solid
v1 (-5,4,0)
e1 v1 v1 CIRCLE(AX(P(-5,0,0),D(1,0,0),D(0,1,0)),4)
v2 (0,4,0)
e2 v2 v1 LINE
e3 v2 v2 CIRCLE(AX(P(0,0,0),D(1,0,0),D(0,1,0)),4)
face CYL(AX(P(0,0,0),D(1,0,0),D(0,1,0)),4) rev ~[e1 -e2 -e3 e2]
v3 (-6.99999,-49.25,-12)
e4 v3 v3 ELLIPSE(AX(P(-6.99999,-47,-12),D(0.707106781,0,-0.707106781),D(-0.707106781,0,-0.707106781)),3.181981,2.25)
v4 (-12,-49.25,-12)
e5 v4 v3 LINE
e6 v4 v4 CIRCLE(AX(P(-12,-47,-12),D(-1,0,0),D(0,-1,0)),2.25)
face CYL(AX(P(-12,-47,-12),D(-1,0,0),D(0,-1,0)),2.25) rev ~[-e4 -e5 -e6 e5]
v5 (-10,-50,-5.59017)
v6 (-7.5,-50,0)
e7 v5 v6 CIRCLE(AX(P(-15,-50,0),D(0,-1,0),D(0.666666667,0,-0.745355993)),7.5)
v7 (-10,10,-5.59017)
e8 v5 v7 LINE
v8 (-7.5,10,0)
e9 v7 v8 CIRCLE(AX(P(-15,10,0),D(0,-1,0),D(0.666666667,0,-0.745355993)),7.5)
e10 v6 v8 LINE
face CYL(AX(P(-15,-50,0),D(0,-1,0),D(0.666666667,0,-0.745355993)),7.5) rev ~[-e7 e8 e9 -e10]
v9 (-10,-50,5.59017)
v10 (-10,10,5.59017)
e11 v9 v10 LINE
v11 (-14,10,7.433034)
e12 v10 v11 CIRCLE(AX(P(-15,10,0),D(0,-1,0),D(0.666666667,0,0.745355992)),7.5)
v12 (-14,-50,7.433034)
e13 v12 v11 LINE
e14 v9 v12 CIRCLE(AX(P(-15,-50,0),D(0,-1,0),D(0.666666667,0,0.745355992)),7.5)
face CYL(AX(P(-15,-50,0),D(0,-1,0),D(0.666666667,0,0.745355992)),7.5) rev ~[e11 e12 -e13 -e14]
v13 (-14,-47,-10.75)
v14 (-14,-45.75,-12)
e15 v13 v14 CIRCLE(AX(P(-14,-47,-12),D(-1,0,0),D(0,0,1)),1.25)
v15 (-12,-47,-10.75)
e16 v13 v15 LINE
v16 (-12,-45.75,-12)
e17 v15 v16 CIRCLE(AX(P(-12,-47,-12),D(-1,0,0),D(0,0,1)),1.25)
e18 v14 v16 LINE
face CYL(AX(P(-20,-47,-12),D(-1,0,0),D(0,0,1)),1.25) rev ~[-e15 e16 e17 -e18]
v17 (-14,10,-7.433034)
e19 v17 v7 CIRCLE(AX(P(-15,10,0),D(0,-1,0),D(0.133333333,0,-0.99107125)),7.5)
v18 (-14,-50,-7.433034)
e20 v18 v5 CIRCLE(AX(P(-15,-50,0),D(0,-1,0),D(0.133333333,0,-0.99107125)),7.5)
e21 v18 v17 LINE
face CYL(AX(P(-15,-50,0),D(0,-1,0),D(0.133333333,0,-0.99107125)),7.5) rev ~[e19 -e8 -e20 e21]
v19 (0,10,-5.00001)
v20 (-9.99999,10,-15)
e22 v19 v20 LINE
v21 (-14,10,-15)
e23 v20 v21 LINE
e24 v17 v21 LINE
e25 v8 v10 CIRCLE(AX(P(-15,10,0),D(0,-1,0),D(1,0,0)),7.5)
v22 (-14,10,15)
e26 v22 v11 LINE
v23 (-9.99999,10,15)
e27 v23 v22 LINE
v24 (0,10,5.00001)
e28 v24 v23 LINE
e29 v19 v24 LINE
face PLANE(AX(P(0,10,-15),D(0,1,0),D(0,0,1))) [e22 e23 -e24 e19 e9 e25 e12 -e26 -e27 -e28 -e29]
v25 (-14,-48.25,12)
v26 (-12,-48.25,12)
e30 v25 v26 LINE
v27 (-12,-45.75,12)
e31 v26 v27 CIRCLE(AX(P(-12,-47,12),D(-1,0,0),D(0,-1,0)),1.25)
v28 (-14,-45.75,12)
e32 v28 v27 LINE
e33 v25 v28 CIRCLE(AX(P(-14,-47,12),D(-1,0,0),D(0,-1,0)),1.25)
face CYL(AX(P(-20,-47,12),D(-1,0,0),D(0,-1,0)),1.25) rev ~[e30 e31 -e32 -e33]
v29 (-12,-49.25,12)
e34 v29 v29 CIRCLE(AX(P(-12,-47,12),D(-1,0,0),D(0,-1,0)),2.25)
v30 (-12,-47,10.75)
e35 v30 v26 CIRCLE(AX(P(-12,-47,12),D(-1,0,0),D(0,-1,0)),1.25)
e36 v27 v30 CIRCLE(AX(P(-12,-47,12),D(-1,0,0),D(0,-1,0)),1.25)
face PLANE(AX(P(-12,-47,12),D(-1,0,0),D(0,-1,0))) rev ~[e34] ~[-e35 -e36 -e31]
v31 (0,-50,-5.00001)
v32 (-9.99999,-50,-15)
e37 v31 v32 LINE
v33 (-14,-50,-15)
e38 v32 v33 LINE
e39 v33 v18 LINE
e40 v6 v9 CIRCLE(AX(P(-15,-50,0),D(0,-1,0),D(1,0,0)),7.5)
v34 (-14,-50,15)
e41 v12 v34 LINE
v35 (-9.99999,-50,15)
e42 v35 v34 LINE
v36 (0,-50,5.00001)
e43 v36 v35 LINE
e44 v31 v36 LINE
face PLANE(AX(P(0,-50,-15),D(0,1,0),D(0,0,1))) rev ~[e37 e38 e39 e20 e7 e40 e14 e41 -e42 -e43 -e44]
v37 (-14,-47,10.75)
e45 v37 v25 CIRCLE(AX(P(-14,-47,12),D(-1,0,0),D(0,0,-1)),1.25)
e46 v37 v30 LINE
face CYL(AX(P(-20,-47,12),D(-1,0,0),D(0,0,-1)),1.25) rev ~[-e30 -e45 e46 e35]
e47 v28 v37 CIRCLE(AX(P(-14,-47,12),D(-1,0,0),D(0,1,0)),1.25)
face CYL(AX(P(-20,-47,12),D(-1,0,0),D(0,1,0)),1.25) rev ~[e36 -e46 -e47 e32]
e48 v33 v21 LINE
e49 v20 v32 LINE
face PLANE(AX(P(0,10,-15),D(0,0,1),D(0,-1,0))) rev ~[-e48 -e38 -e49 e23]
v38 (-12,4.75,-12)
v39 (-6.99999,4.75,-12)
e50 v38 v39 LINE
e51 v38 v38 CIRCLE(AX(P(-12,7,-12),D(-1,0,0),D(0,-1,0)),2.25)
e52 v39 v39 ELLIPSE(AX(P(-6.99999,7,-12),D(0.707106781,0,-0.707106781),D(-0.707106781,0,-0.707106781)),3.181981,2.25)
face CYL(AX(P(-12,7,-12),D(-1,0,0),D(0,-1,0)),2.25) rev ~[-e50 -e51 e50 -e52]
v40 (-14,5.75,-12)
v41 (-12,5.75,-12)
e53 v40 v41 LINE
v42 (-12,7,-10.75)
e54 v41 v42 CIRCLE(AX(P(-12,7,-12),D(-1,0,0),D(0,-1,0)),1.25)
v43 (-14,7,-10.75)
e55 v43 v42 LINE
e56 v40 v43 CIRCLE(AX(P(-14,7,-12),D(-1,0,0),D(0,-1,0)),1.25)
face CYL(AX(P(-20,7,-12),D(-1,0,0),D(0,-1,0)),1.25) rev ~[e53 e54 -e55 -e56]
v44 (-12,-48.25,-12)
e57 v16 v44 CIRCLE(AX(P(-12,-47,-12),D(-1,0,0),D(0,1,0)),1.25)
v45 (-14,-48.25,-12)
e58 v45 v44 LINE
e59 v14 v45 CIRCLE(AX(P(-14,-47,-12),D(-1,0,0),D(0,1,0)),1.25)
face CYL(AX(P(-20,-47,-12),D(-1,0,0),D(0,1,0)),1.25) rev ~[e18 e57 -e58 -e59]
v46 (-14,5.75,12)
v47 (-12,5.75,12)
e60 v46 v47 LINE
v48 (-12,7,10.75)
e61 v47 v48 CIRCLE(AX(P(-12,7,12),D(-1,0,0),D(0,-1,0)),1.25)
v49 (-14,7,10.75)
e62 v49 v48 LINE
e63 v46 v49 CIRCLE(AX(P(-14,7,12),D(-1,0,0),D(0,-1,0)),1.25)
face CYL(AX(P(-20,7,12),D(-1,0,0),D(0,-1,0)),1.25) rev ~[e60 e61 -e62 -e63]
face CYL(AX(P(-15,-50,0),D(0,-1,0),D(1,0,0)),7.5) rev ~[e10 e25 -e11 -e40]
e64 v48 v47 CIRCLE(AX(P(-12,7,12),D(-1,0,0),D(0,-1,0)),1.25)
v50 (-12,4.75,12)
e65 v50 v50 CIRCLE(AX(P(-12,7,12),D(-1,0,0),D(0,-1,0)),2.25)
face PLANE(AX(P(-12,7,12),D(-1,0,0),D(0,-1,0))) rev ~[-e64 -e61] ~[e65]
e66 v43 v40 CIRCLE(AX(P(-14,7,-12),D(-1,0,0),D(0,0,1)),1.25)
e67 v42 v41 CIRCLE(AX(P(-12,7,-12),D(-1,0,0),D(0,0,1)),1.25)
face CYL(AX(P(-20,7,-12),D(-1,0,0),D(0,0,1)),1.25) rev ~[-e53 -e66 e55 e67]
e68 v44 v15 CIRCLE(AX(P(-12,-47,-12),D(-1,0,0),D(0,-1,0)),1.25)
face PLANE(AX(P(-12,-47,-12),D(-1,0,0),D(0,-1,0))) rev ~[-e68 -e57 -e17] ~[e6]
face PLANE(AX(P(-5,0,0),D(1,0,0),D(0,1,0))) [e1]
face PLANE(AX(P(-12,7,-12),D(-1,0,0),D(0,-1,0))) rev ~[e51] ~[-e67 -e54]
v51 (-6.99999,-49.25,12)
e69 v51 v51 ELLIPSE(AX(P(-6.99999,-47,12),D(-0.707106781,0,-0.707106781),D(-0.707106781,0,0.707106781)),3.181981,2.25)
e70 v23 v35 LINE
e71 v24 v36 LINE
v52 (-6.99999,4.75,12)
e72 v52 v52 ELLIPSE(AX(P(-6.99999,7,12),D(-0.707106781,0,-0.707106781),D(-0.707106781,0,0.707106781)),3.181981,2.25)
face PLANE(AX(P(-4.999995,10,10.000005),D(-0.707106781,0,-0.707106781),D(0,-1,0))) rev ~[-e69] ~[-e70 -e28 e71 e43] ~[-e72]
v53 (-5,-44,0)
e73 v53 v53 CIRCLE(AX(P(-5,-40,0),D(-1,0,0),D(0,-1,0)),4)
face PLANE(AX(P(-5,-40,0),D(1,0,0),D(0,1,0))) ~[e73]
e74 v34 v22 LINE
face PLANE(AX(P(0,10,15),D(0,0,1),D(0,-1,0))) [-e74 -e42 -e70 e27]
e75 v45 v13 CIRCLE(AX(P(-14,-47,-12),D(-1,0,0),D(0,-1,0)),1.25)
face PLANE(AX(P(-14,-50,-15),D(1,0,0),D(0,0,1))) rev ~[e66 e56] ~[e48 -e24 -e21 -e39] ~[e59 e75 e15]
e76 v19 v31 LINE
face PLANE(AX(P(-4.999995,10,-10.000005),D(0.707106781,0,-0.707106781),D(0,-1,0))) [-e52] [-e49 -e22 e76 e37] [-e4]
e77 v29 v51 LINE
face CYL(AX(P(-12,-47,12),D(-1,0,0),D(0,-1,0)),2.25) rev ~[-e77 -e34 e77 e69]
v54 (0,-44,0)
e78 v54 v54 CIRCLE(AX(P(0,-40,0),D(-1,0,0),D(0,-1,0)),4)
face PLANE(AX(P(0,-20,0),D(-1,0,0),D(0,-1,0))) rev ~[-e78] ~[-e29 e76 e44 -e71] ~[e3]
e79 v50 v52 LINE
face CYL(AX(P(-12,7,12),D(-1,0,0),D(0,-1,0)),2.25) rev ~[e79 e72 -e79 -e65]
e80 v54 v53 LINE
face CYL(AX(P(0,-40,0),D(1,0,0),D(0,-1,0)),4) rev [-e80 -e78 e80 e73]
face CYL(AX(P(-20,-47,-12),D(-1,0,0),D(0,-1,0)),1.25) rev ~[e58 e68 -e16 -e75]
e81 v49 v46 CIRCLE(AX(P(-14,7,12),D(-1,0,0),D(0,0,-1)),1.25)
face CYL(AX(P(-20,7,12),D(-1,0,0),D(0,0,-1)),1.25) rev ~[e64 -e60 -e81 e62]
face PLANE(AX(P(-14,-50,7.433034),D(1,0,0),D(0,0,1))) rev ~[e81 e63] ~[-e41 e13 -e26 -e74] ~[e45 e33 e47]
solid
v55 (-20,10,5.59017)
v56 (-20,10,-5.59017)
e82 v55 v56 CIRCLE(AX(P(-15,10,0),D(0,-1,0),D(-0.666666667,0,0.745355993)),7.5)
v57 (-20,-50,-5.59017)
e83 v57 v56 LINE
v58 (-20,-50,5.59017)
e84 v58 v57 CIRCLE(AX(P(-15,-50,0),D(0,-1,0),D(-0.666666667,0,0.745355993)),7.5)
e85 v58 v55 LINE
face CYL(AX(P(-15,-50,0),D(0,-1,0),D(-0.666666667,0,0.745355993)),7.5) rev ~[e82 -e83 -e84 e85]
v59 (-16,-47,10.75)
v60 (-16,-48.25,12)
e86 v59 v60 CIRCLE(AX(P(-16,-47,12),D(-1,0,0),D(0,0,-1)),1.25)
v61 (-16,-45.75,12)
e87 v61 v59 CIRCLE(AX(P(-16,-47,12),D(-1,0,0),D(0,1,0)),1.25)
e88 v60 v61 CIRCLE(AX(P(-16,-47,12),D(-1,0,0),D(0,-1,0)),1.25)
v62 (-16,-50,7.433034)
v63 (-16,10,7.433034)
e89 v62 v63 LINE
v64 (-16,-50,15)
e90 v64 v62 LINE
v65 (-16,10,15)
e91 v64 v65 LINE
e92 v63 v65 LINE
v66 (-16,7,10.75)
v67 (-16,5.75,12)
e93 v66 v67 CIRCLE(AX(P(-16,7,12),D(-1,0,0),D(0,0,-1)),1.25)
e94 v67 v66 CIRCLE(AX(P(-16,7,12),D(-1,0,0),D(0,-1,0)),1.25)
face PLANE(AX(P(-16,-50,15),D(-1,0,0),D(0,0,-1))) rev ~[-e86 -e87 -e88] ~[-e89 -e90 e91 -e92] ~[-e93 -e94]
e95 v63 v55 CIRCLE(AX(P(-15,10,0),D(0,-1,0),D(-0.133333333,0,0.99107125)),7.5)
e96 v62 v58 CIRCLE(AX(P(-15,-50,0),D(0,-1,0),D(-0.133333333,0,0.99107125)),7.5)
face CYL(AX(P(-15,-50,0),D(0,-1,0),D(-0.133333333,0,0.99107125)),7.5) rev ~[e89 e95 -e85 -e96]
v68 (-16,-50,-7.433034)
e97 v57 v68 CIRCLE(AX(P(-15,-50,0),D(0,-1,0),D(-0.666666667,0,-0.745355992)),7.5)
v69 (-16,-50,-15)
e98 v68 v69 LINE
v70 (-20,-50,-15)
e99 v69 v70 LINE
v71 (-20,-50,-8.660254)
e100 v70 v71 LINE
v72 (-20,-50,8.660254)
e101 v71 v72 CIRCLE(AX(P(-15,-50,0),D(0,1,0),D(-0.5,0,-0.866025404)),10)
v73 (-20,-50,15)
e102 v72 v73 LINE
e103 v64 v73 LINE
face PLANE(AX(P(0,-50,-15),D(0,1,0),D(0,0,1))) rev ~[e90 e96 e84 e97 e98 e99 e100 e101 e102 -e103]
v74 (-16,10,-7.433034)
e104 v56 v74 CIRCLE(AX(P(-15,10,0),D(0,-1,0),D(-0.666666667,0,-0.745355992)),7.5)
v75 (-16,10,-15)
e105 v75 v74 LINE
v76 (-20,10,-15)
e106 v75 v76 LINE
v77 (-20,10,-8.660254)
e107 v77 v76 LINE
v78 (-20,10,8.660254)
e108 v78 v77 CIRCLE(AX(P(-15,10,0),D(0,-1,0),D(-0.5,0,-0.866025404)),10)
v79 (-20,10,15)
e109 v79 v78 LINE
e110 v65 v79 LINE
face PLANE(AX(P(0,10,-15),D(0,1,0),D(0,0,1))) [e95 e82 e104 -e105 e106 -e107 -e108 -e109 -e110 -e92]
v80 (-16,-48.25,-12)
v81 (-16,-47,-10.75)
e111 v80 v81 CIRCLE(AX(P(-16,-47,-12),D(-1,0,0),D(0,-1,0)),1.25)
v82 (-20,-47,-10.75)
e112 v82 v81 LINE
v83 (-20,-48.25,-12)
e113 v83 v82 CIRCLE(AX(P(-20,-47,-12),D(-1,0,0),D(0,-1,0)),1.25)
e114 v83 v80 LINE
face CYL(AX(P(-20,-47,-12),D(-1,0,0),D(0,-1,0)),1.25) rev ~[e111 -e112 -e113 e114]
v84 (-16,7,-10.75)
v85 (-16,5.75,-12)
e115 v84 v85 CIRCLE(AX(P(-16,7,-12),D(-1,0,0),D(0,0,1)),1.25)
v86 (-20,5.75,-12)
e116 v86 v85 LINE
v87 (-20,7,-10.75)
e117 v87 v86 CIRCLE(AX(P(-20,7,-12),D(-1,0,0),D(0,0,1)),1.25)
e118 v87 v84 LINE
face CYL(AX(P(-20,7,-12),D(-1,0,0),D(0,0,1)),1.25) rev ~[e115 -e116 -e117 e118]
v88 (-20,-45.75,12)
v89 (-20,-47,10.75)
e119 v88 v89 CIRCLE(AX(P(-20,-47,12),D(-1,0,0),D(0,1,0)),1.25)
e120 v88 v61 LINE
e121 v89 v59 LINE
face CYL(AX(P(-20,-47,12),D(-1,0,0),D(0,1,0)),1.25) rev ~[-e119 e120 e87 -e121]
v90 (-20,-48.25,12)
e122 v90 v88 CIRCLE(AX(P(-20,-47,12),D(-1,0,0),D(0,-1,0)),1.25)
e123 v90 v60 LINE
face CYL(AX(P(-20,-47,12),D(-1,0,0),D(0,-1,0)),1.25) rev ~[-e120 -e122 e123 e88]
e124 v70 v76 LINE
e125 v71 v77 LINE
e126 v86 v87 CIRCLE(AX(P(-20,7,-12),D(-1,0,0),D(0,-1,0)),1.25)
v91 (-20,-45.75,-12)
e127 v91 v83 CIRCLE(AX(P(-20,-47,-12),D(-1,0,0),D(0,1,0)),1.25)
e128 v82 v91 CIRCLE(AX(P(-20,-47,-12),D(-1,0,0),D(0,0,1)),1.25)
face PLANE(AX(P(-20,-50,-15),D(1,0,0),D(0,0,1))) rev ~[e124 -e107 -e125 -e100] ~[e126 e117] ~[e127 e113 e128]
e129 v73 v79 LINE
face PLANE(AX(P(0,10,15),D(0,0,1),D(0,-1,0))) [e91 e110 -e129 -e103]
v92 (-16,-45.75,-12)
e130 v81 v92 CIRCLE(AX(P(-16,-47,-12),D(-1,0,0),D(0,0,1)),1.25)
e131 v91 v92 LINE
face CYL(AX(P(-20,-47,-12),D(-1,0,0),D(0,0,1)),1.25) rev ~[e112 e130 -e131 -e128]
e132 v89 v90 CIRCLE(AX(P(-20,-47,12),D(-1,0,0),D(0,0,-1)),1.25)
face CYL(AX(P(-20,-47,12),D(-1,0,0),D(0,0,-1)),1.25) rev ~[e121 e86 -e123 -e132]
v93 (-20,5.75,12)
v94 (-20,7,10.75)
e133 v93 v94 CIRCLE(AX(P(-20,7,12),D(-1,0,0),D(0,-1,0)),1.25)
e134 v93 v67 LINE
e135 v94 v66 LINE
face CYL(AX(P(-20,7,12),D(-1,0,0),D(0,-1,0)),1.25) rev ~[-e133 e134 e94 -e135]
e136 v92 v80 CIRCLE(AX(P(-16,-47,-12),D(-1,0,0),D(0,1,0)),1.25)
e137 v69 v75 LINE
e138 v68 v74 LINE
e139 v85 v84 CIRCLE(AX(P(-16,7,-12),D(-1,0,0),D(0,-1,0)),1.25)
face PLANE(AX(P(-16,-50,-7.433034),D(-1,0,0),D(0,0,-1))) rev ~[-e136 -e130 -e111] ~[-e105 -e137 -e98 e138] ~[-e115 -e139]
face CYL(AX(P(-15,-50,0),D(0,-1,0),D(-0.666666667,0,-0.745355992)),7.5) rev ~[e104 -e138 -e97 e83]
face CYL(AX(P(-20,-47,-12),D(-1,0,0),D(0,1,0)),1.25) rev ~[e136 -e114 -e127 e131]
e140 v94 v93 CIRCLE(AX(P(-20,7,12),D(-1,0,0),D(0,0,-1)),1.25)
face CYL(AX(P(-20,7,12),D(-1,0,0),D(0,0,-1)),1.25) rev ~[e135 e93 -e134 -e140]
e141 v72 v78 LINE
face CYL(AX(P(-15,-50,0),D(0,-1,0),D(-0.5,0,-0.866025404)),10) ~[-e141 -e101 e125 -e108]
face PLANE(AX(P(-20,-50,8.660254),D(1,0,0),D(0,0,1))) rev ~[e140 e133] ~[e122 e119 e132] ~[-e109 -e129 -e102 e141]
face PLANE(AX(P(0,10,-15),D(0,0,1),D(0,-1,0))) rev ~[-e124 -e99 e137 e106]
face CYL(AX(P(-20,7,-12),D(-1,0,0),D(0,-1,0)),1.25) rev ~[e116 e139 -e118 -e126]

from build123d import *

# Parameters (mm, degrees)
F0_R        = 4
F1_DEPTH    = 200
F3_R        = 4
F4_DEPTH    = 5
F3_R_2      = 5
F4_FACE_R   = 5
F4_FACE_R_2 = 4
F1_FACE_R   = 4
F2_FACE_R   = 4
F3_W        = 60.0000001103
F3_H        = 30
F5_DEPTH    = 30
F7_DEPTH    = 60.0010001103
F8_DEPTH    = 60.0010001103
F9_SIZE     = 9.99999
F11_DEPTH   = 25
F13_START   = -2
F12_R       = 2.25
F12_R_2     = 1.25
F13_DEPTH   = 23
F14_DEPTH   = 200
F15_DEPTH   = 5


# Not quite as in the source:
# - a fillet or chamfer is up to 0.001 mm smaller than in the source, because OpenCascade refuses the exact size
# - a pattern or mirror of a feature is missing from the dataset's text; its kind, count and spacing are read off the source's solid
# - a feature names something its author has since deleted; it is built from what else it names


with BuildPart() as f1:
    # F0 (on Right) → F1 (new body)
    with BuildSketch(Plane.YZ):
        Circle(F0_R)
    extrude(amount=F1_DEPTH)


with BuildPart() as f2_1:
    # F2: copy of F1
    add(f1.part.moved(Location((0, -40, 0))))


with BuildPart() as f4:
    # F3 (on face) → F4 (new body)
    with BuildSketch(Plane(origin=(0, 0, 0), x_dir=(0, -1, 0), z_dir=(-1, 0, 0))):
        with Locations((40, 0)):
            Circle(F3_R)
    extrude(amount=-F4_DEPTH)


with BuildPart() as f4b:
    # F3 (on face) → F4, piece 2 (new body)
    with BuildSketch(Plane(origin=(0, 0, 0), x_dir=(0, -1, 0), z_dir=(-1, 0, 0))):
        Circle(F3_R_2)
        Circle(F3_R, mode=Mode.SUBTRACT)
    extrude(amount=-F4_DEPTH)


with BuildPart() as f1_1:
    add(f1.part)

    add(f2_1.part)  # F5 merges F2_1

    add(f4.part)  # F5 merges F4

    add(f4b.part)  # F5 merges F4b
    # F4_face (on face) + F1_face (on face) + F2_face (on face) + F3 (on face) → F5 (join)
    with BuildSketch(Plane(origin=(0, 0, 0), x_dir=(0, -1, 0), z_dir=(-1, 0, 0))):
        Circle(F4_FACE_R)
        Circle(F4_FACE_R_2, mode=Mode.SUBTRACT)
        with Locations((40, 0)):
            Circle(F4_FACE_R_2)
    with BuildSketch(Plane(origin=(0, 0, 0), x_dir=(0, 1, 0), z_dir=(-1, 0, 0))):
        Circle(F1_FACE_R)
    with BuildSketch(Plane(origin=(0, -40, 0), x_dir=(0, -1, 0), z_dir=(-1, 0, 0))):
        Circle(F2_FACE_R)
    with BuildSketch(Plane(origin=(0, 0, 0), x_dir=(0, -1, 0), z_dir=(-1, 0, 0))):
        with Locations((19.9999999448, 0)):
            Rectangle(F3_W, F3_H)
        Circle(F3_R_2, mode=Mode.SUBTRACT)
        with Locations((40, 0)):
            Circle(F3_R_2, mode=Mode.SUBTRACT)
        with Locations((40, 0)):
            Circle(F3_R_2)
        with Locations((40, 0)):
            Circle(F3_R, mode=Mode.SUBTRACT)
    extrude(amount=F5_DEPTH)

    # F6 (on face) → F7 (cut, through all)
    with BuildSketch(Plane.XZ.offset(50)):
        with BuildLine():
            Line((-10, -5.5901699437), (-10, 5.5901699437))
            ThreePointArc((-10, 5.5901699437), (-11.8616824051, 6.8118252087), (-14, 7.4330343737))
            Line((-14, 7.4330343737), (-14, -7.4330343737))
            ThreePointArc((-14, -7.4330343737), (-11.8616824051, -6.8118252087), (-10, -5.5901699437))
        make_face()
        with BuildLine():
            Line((-14, -7.4330343737), (-14, 7.4330343737))
            ThreePointArc((-14, 7.4330343737), (-15, 7.5), (-16, 7.4330343737))
            Line((-16, 7.4330343737), (-16, -7.4330343737))
            ThreePointArc((-16, -7.4330343737), (-15, -7.5), (-14, -7.4330343737))
        make_face()
        with BuildLine():
            Line((-16, -7.4330343737), (-16, 7.4330343737))
            ThreePointArc((-16, 7.4330343737), (-18.1383175949, 6.8118252087), (-20, 5.5901699437))
            Line((-20, 5.5901699437), (-20, -5.5901699437))
            ThreePointArc((-20, -5.5901699437), (-18.1383175949, -6.8118252087), (-16, -7.4330343737))
        make_face()
        with BuildLine():
            ThreePointArc((-10, -5.5901699437), (-8.1534680312, -3.0618621785), (-7.5, 0))
            ThreePointArc((-7.5, 0), (-8.1534680312, 3.0618621785), (-10, 5.5901699437))
            Line((-10, 5.5901699437), (-10, -5.5901699437))
        make_face()
        with BuildLine():
            Line((-20, -5.5901699437), (-20, 5.5901699437))
            ThreePointArc((-20, 5.5901699437), (-22.5, 0), (-20, -5.5901699437))
        make_face()
        with BuildLine():
            ThreePointArc((-16, 9.9498743711), (-15, 10), (-14, 9.9498743711))
            Line((-14, 9.9498743711), (-14, 15))
            Line((-14, 15), (-16, 15))
            Line((-16, 15), (-16, 9.9498743711))
        make_face()
        with BuildLine():
            ThreePointArc((-16, 7.4330343737), (-15, 7.5), (-14, 7.4330343737))
            Line((-14, 7.4330343737), (-14, 9.9498743711))
            ThreePointArc((-14, 9.9498743711), (-15, 10), (-16, 9.9498743711))
            Line((-16, 9.9498743711), (-16, 7.4330343737))
        make_face()
        with BuildLine():
            Line((-14, -9.9498743711), (-14, -7.4330343737))
            ThreePointArc((-14, -7.4330343737), (-15, -7.5), (-16, -7.4330343737))
            Line((-16, -7.4330343737), (-16, -9.9498743711))
            ThreePointArc((-16, -9.9498743711), (-15, -10), (-14, -9.9498743711))
        make_face()
        with BuildLine():
            Line((-14, -15), (-14, -9.9498743711))
            ThreePointArc((-14, -9.9498743711), (-15, -10), (-16, -9.9498743711))
            Line((-16, -9.9498743711), (-16, -15))
            Line((-16, -15), (-14, -15))
        make_face()
    extrude(amount=-F7_DEPTH, mode=Mode.SUBTRACT)

    # F6 (on face) → F8 (cut, through all)
    with BuildSketch(Plane.XZ.offset(50)):
        with BuildLine():
            ThreePointArc((-20, -8.6602540378), (-25, 0), (-20, 8.6602540378))
            Line((-20, 8.6602540378), (-20, 15))
            Line((-20, 15), (-30, 15))
            Line((-30, 15), (-30, -15))
            Line((-30, -15), (-20, -15))
            Line((-20, -15), (-20, -8.6602540378))
        make_face()
    extrude(amount=-F8_DEPTH, mode=Mode.SUBTRACT)

    # F9 (size 10 in the source; OpenCascade refuses exactly that, so slightly less here)
    f9_edges = [f1_1.edges().sort_by_distance(p)[0] for p in [
        (0, -20, 15),
        (0, -20, -15),
    ]]
    chamfer(f9_edges, length=F9_SIZE)

    # F10 (on face) → F11 (cut)
    with BuildSketch(Plane(origin=(-20, 0, 0), x_dir=(0, -1, 0), z_dir=(-1, 0, 0))):
        with BuildLine():
            Line((-7.0000001103, 12), (-7.0000001103, 10.75))
            ThreePointArc((-7.0000001103, 10.75), (-6.1161166338, 11.1161165235), (-5.7500001103, 12))
            Line((-5.7500001103, 12), (-7.0000001103, 12))
        make_face()
        with BuildLine():
            ThreePointArc((-5.7500001103, 12), (-7.8838835868, 12.8838834765), (-7.0000001103, 10.75))
            Line((-7.0000001103, 10.75), (-7.0000001103, 12))
            Line((-7.0000001103, 12), (-5.7500001103, 12))
        make_face()
        with BuildLine():
            ThreePointArc((45.75, 12), (46.1161165235, 11.1161165235), (47, 10.75))
            Line((47, 10.75), (47, 12))
            Line((47, 12), (45.75, 12))
        make_face()
        with BuildLine():
            Line((47, 12), (47, 10.75))
            ThreePointArc((47, 10.75), (47.8838834765, 11.1161165235), (48.25, 12))
            ThreePointArc((48.25, 12), (47, 13.25), (45.75, 12))
            Line((45.75, 12), (47, 12))
        make_face()
        with BuildLine():
            ThreePointArc((47, -10.75), (46.1161165235, -11.1161165235), (45.75, -12))
            Line((45.75, -12), (47, -12))
            Line((47, -12), (47, -10.75))
        make_face()
        with BuildLine():
            Line((47, -12), (45.75, -12))
            ThreePointArc((45.75, -12), (47, -13.25), (48.25, -12))
            ThreePointArc((48.25, -12), (47.8838834765, -11.1161165235), (47, -10.75))
            Line((47, -10.75), (47, -12))
        make_face()
        with BuildLine():
            ThreePointArc((-5.7500001103, -12), (-6.1161166338, -11.1161165235), (-7.0000001103, -10.75))
            Line((-7.0000001103, -10.75), (-7.0000001103, -12))
            Line((-7.0000001103, -12), (-5.7500001103, -12))
        make_face()
        with BuildLine():
            Line((-7.0000001103, -12), (-7.0000001103, -10.75))
            ThreePointArc((-7.0000001103, -10.75), (-7.8838835868, -12.8838834765), (-5.7500001103, -12))
            Line((-5.7500001103, -12), (-7.0000001103, -12))
        make_face()
    extrude(amount=-F11_DEPTH, mode=Mode.SUBTRACT)

    # F12 (on face) → F13 (cut)
    with BuildSketch(Plane(origin=(-14, 0, 0), x_dir=(0, -1, 0), z_dir=(-1, 0, 0)).offset(F13_START)):
        with Locations((47, 12)):
            Circle(F12_R)
        with Locations((47, 12)):
            Circle(F12_R_2, mode=Mode.SUBTRACT)
        with Locations((47, -12)):
            Circle(F12_R)
        with Locations((-7.0000001103, -12)):
            Circle(F12_R)
        with Locations((-7.0000001103, 12)):
            Circle(F12_R)
        with Locations((-7.0000001103, 12)):
            Circle(F12_R_2, mode=Mode.SUBTRACT)
    extrude(amount=-F13_DEPTH, mode=Mode.SUBTRACT)

    # F14 (cut, through all): faces of the model
    f14_faces = [f1_1.faces().sort_by_distance(p)[0] for p in [
        (200, -40, 0),
        (200, 0, 0),
    ]]
    extrude(f14_faces, amount=-F14_DEPTH, mode=Mode.SUBTRACT)

    # F15 (cut): faces of the model
    f15_faces = [f1_1.faces().sort_by_distance(p)[0] for p in [
        (0, 0, 0),
        (0, 0, 0),
        (5, 4.8585786438, 0),
    ]]
    f15 = extrude(f15_faces, amount=-F15_DEPTH, mode=Mode.SUBTRACT)

    # F15_copies: F15 across plane
    add(f15.mirror(Plane(origin=(0, -20, 0), x_dir=(0, 0, -1), z_dir=(0, -1, 0))), mode=Mode.SUBTRACT)


solid = f1_1.part
